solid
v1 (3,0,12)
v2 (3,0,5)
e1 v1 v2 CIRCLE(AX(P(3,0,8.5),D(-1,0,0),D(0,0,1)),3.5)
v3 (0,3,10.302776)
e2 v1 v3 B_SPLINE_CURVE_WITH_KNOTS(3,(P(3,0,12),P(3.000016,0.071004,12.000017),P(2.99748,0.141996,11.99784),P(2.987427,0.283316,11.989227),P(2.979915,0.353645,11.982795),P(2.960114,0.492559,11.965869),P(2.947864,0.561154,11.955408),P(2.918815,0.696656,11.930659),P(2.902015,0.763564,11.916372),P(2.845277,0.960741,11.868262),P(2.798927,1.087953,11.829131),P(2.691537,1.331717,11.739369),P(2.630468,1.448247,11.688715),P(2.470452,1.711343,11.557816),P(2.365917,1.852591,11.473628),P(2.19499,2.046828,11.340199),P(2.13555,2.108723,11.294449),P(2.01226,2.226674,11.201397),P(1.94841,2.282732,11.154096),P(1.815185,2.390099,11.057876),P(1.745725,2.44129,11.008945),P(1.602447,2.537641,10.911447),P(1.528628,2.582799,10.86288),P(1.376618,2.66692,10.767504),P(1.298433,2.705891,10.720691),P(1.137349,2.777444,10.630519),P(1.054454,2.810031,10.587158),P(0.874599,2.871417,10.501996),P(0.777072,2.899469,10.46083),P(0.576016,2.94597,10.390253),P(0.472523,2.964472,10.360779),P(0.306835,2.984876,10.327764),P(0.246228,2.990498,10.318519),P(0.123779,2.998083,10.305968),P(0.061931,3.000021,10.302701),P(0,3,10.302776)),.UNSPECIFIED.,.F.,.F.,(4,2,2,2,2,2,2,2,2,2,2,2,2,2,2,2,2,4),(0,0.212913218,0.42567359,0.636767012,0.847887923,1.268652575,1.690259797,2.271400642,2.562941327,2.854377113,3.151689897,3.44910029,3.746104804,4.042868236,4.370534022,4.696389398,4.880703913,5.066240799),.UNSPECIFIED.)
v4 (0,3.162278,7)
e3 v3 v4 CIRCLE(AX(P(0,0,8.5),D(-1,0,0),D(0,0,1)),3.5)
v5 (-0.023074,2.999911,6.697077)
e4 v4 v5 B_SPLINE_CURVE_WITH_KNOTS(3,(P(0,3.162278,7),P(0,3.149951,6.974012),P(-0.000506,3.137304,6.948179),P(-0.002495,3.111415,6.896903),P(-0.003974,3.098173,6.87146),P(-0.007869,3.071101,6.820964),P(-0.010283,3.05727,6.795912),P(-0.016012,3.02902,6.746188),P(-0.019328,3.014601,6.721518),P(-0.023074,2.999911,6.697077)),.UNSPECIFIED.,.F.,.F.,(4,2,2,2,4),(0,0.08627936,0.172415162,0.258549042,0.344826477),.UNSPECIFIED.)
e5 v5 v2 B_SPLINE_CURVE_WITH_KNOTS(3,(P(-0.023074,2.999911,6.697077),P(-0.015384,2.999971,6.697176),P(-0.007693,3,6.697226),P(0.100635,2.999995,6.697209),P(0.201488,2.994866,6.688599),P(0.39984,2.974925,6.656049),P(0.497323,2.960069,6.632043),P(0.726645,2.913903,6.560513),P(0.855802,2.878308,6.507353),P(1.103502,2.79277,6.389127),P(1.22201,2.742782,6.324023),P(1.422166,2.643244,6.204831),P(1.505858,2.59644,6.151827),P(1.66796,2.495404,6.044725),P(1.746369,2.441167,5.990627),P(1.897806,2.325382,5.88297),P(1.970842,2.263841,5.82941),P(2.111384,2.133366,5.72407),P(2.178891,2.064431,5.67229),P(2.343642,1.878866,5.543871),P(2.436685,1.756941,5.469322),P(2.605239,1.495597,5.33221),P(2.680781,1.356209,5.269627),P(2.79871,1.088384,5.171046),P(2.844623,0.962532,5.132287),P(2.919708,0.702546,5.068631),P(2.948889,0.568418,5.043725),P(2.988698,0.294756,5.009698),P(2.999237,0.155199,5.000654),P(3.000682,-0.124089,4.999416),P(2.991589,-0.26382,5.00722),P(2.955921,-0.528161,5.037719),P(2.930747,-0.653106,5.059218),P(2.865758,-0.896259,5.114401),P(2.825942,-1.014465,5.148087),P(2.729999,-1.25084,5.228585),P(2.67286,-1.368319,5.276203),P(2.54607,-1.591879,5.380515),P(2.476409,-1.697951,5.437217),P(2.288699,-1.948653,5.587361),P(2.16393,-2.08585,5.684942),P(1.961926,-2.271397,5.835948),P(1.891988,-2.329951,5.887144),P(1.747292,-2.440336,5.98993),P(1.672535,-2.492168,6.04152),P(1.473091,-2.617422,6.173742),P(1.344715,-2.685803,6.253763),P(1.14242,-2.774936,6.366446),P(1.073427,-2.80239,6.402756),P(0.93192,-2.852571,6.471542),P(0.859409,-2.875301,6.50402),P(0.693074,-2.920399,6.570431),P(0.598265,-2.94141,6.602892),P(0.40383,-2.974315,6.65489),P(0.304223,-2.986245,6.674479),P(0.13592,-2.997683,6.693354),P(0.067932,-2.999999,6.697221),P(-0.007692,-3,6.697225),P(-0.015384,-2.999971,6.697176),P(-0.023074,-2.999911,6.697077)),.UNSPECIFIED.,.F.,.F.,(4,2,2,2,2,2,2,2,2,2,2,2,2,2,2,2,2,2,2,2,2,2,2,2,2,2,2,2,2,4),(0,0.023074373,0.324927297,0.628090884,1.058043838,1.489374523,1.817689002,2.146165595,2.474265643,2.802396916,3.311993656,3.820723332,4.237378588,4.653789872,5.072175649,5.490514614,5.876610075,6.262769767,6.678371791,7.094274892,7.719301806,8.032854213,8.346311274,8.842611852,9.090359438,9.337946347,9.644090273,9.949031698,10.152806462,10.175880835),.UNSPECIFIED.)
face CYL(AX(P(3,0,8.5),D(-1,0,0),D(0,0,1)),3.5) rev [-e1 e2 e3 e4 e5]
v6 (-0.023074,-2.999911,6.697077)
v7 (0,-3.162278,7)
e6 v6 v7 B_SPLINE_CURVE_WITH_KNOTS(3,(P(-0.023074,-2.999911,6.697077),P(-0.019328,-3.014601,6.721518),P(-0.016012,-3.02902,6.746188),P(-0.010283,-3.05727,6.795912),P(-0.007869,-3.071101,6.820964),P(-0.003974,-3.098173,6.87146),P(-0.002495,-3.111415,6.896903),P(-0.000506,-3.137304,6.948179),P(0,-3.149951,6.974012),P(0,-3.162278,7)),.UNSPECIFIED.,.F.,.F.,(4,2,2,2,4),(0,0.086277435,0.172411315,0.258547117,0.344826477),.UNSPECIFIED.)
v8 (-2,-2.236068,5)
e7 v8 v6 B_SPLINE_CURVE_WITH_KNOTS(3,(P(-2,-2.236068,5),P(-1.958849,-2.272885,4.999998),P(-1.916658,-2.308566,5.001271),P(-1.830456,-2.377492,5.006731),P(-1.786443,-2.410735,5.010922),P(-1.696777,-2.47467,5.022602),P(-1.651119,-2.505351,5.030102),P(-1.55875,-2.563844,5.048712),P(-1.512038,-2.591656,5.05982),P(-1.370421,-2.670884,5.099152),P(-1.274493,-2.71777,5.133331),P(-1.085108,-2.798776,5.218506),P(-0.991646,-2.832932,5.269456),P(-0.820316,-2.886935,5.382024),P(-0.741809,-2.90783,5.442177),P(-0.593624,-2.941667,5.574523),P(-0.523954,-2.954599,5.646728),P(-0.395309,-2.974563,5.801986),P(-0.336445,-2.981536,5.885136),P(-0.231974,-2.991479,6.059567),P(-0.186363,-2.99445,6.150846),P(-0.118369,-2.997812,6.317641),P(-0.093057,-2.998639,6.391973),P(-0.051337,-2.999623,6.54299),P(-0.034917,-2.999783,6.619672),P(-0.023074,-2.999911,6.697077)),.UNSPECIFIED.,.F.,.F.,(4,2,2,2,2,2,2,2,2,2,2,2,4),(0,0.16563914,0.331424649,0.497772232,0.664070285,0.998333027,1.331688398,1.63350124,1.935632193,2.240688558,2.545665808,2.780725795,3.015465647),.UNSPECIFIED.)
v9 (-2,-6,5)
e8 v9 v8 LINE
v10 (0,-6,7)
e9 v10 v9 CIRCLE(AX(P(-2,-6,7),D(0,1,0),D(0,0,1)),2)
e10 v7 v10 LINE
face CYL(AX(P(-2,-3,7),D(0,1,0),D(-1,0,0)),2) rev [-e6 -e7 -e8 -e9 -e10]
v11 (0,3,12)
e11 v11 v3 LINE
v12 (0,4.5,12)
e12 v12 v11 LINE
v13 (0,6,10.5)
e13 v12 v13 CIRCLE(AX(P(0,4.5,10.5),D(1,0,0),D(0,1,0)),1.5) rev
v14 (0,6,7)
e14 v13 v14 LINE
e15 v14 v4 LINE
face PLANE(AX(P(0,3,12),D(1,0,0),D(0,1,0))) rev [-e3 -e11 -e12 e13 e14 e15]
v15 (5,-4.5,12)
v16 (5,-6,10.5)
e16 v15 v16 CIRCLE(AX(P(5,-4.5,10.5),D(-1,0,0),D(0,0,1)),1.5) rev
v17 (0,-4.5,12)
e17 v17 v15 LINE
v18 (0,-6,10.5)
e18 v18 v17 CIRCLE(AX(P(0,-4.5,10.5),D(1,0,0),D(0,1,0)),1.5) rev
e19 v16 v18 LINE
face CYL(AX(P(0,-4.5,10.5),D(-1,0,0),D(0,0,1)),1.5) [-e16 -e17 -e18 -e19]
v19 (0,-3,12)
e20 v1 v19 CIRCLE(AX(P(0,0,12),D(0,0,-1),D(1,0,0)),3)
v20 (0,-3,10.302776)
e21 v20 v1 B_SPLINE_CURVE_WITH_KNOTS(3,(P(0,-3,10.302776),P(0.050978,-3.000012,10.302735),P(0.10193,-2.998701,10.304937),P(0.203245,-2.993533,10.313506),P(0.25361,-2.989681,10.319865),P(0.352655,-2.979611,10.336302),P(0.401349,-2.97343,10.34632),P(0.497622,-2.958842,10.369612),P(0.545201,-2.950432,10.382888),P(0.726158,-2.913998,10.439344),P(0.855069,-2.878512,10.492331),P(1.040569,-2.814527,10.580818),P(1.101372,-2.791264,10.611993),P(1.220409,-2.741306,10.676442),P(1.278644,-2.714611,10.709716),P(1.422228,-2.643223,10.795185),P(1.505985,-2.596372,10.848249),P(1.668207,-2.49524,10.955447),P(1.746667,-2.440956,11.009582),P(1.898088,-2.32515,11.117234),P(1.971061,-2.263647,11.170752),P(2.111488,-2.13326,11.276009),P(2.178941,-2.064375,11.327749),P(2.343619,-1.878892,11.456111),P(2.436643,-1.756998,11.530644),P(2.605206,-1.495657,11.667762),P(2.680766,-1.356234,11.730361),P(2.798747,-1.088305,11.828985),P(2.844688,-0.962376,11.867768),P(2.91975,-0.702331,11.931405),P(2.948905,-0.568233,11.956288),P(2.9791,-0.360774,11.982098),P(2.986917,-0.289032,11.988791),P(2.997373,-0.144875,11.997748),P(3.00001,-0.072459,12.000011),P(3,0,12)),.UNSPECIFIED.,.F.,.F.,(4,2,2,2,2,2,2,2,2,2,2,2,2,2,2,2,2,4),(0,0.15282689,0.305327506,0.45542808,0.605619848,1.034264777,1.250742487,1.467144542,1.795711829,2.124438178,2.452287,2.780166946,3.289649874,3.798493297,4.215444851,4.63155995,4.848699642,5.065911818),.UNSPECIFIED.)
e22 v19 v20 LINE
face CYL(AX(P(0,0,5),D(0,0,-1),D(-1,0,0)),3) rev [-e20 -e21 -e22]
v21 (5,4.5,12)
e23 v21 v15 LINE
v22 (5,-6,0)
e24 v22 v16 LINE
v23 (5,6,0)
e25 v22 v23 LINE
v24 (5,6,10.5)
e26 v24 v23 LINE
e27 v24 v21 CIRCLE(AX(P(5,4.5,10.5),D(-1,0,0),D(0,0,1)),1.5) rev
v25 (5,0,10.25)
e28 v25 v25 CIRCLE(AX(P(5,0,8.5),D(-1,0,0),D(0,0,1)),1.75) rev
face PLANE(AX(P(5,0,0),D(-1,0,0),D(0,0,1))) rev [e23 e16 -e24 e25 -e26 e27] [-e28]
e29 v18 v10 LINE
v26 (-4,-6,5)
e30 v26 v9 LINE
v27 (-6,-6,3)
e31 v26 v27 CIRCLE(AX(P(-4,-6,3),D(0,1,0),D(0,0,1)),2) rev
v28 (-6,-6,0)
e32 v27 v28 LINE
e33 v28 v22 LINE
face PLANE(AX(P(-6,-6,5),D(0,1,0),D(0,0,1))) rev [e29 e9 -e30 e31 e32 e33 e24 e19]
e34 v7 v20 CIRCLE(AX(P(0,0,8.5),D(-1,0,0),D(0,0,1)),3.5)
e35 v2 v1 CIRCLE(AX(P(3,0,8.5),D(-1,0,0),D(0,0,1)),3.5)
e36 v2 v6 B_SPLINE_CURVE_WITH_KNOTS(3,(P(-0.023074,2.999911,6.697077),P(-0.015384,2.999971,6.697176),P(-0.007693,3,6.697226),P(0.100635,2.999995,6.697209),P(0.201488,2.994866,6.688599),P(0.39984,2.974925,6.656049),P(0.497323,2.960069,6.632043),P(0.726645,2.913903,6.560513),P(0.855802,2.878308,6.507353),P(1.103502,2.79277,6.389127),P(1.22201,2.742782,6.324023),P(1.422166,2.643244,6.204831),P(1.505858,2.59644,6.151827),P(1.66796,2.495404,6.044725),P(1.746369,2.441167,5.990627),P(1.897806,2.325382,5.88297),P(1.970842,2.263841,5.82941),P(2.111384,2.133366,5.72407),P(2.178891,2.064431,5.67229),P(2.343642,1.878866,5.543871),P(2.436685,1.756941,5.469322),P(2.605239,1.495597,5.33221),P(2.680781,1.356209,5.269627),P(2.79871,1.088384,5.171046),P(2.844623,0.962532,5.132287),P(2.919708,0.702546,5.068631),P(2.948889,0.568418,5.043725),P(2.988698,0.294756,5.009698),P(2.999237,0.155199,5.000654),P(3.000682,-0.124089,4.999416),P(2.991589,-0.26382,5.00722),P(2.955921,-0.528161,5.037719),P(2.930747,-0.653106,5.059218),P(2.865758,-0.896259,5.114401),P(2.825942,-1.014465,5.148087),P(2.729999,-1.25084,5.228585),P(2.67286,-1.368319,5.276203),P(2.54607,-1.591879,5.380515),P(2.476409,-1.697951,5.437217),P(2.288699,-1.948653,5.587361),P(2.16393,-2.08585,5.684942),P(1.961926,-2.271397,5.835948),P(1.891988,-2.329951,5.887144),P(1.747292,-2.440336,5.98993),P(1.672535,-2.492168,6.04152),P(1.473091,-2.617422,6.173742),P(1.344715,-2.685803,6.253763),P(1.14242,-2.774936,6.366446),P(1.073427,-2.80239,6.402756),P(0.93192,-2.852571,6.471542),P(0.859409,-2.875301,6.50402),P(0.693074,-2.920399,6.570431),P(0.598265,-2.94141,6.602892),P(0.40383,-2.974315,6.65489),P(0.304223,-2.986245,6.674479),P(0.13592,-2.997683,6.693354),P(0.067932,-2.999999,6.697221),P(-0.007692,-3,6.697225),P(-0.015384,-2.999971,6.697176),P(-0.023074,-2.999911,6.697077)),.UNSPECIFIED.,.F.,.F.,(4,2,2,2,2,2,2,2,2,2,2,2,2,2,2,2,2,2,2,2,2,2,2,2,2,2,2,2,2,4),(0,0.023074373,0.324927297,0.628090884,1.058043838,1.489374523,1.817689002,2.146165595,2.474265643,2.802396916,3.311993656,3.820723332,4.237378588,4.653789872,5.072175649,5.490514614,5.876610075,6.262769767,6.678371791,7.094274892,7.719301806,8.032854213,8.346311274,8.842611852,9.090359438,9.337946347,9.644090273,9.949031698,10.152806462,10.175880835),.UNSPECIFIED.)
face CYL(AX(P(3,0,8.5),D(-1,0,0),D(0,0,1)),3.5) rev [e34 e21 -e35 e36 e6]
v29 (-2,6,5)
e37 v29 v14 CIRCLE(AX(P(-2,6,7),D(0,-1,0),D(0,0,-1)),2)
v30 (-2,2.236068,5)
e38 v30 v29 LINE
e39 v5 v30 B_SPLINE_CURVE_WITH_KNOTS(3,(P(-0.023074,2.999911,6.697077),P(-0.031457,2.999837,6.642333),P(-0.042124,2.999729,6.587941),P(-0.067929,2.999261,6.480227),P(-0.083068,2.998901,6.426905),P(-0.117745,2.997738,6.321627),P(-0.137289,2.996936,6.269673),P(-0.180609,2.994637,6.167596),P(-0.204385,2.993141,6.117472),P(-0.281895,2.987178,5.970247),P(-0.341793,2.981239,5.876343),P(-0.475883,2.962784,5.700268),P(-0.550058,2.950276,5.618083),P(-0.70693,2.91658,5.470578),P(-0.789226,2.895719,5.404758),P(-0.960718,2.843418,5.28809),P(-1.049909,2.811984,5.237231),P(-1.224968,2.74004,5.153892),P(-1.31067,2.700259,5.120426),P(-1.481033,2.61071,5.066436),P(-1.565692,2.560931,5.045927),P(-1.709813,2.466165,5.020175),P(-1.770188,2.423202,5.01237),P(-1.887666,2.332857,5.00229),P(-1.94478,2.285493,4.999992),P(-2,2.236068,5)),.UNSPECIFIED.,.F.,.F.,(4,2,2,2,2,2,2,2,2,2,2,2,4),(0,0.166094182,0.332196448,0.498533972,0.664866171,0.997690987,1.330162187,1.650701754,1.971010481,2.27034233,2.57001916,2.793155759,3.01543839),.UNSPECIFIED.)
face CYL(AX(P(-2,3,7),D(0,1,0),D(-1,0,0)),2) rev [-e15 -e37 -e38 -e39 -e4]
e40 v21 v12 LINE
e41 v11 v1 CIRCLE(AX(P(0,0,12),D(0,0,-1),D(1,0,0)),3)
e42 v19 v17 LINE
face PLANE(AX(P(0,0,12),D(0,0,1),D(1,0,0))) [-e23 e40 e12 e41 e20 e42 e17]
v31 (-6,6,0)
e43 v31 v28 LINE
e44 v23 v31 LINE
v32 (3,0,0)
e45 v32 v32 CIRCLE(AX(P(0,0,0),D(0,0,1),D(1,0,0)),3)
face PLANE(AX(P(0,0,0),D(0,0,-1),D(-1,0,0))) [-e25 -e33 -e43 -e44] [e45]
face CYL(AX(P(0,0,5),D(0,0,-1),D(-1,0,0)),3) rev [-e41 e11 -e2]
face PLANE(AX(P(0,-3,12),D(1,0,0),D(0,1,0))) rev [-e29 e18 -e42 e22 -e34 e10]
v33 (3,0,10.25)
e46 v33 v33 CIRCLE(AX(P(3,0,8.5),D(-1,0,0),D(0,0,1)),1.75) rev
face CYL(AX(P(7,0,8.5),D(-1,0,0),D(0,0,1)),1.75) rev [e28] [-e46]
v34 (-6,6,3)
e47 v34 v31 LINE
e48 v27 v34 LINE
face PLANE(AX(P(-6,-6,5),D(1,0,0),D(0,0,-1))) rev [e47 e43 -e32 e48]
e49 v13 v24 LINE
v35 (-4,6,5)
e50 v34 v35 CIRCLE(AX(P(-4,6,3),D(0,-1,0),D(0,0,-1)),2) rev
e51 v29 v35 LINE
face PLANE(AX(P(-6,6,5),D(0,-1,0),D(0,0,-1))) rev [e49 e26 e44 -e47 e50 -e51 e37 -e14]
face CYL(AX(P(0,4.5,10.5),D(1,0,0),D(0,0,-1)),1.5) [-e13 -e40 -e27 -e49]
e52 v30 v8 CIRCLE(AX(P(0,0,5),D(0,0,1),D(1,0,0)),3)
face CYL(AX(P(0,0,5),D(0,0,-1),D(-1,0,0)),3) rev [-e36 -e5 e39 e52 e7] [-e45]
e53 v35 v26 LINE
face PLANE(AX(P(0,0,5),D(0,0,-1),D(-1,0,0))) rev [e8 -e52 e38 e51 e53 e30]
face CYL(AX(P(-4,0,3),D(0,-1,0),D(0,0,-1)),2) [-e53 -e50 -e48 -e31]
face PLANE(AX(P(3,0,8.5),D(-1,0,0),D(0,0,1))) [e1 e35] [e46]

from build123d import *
from build123d.topology import SkipClean

# Parameters (mm, degrees)
SKETCH_1_W          = 12
SKETCH_1_H          = 12
SKETCH_1_R          = 3
EXTRUDE_1_DEPTH     = 5
EXTRUDE_2_DEPTH     = 7
SKETCH_4_R          = 1.75
CUT_EXTRUDE_1_DEPTH = 7
SKETCH_5_R          = 3.5
CUT_EXTRUDE_2_DEPTH = 3
FILLET_1_R          = 2
FILLET_2_R          = 1.5
FILLET_3_R          = 2
SKETCH_6_W          = 51.167953154
SKETCH_6_H          = 21.993207172
CUT_EXTRUDE_3_DEPTH = 1


with BuildPart() as part:
    # 草图1 → 凸台-拉伸1 (new body)
    with BuildSketch(Plane.XY):
        Rectangle(SKETCH_1_W, SKETCH_1_H)
        Circle(SKETCH_1_R, mode=Mode.SUBTRACT)
    extrude(amount=EXTRUDE_1_DEPTH)

    # 草图3 → 凸台-拉伸2 (add)
    with BuildSketch(Plane.XY.offset(5)):
        with BuildLine():
            Line((0, -6), (6, -6))
            Line((6, -6), (6, 6))
            Line((6, 6), (0, 6))
            Line((0, 6), (0, 3))
            ThreePointArc((0, 3), (3, 0), (0, -3))
            Line((0, -3), (0, -6))
        make_face()
    extrude(amount=EXTRUDE_2_DEPTH)

    # 草图4 → 切除-拉伸1 (cut)
    with BuildSketch(Plane.ZY):
        with Locations((8.5, 0)):
            Circle(SKETCH_4_R)
    extrude(amount=-CUT_EXTRUDE_1_DEPTH, mode=Mode.SUBTRACT)

    # 草图5 → 切除-拉伸2 (cut)
    with SkipClean():  # the faces are left unmerged after this step: merging them gives an invalid solid
        with BuildSketch(Plane.ZY):
            with Locations((8.5, 0)):
                Circle(SKETCH_5_R)
        extrude(amount=-CUT_EXTRUDE_2_DEPTH, mode=Mode.SUBTRACT)

    # 圆角1
    # the kernel refuses this fillet: 2 mm, written as the material it adds along each edge
    with BuildSketch(Plane(origin=(0, 2, 5), x_dir=(-1, 0, 0), z_dir=(0, -1, 0))) as fillet_1_piece_1_section:
        with BuildLine():
            CenterArc((FILLET_1_R, -FILLET_1_R), FILLET_1_R, 90, 90)
            Line((0, -FILLET_1_R), (0, 0))
            Line((0, 0), (FILLET_1_R, 0))
        make_face()
    fillet_1_piece_1 = extrude(amount=8, mode=Mode.PRIVATE)
    fillet_1_piece_1 = fillet_1_piece_1 - Plane(origin=(0, 0, 5), x_dir=(1, 0, 0), z_dir=(0, 0, -1)) * Cylinder(3, 24, mode=Mode.PRIVATE)
    fillet_1_piece_1 = fillet_1_piece_1 - Plane(origin=(0, 0, 8.5), x_dir=(0, 0, 1), z_dir=(-1, 0, 0)) * Cylinder(3.5, 24, mode=Mode.PRIVATE)
    add(fillet_1_piece_1)
    with BuildSketch(Plane(origin=(0, 6, 5), x_dir=(-1, 0, 0), z_dir=(0, -1, 0))) as fillet_1_piece_2_section:
        with BuildLine():
            CenterArc((FILLET_1_R, -FILLET_1_R), FILLET_1_R, 90, 90)
            Line((0, -FILLET_1_R), (0, 0))
            Line((0, 0), (FILLET_1_R, 0))
        make_face()
    fillet_1_piece_2 = extrude(amount=8, mode=Mode.PRIVATE)
    fillet_1_piece_2 = fillet_1_piece_2 - Plane(origin=(0, 0, 5), x_dir=(1, 0, 0), z_dir=(0, 0, -1)) * Cylinder(3, 24, mode=Mode.PRIVATE)
    fillet_1_piece_2 = fillet_1_piece_2 - Plane(origin=(0, 0, 8.5), x_dir=(0, 0, 1), z_dir=(-1, 0, 0)) * Cylinder(3.5, 24, mode=Mode.PRIVATE)
    add(fillet_1_piece_2)

    # 圆角2
    fillet_2_edges = [part.edges().sort_by_distance(p)[0] for p in [
        (3, 6, 12),
        (3, -6, 12),
    ]]
    fillet(fillet_2_edges, radius=FILLET_2_R)

    # 圆角3
    fillet_3_edges = [part.edges().sort_by_distance(p)[0] for p in [
        (-6, 0, 5),
    ]]
    fillet(fillet_3_edges, radius=FILLET_3_R)

    # 草图6 → 切除-拉伸3 (cut)
    with BuildSketch(Plane(origin=(6, 0, 0), x_dir=(0, 0, -1), z_dir=(1, 0, 0))):
        with Locations((-8.5, 0)):
            Rectangle(SKETCH_6_W, SKETCH_6_H)
    extrude(amount=-CUT_EXTRUDE_3_DEPTH, mode=Mode.SUBTRACT)


solid = part.part
